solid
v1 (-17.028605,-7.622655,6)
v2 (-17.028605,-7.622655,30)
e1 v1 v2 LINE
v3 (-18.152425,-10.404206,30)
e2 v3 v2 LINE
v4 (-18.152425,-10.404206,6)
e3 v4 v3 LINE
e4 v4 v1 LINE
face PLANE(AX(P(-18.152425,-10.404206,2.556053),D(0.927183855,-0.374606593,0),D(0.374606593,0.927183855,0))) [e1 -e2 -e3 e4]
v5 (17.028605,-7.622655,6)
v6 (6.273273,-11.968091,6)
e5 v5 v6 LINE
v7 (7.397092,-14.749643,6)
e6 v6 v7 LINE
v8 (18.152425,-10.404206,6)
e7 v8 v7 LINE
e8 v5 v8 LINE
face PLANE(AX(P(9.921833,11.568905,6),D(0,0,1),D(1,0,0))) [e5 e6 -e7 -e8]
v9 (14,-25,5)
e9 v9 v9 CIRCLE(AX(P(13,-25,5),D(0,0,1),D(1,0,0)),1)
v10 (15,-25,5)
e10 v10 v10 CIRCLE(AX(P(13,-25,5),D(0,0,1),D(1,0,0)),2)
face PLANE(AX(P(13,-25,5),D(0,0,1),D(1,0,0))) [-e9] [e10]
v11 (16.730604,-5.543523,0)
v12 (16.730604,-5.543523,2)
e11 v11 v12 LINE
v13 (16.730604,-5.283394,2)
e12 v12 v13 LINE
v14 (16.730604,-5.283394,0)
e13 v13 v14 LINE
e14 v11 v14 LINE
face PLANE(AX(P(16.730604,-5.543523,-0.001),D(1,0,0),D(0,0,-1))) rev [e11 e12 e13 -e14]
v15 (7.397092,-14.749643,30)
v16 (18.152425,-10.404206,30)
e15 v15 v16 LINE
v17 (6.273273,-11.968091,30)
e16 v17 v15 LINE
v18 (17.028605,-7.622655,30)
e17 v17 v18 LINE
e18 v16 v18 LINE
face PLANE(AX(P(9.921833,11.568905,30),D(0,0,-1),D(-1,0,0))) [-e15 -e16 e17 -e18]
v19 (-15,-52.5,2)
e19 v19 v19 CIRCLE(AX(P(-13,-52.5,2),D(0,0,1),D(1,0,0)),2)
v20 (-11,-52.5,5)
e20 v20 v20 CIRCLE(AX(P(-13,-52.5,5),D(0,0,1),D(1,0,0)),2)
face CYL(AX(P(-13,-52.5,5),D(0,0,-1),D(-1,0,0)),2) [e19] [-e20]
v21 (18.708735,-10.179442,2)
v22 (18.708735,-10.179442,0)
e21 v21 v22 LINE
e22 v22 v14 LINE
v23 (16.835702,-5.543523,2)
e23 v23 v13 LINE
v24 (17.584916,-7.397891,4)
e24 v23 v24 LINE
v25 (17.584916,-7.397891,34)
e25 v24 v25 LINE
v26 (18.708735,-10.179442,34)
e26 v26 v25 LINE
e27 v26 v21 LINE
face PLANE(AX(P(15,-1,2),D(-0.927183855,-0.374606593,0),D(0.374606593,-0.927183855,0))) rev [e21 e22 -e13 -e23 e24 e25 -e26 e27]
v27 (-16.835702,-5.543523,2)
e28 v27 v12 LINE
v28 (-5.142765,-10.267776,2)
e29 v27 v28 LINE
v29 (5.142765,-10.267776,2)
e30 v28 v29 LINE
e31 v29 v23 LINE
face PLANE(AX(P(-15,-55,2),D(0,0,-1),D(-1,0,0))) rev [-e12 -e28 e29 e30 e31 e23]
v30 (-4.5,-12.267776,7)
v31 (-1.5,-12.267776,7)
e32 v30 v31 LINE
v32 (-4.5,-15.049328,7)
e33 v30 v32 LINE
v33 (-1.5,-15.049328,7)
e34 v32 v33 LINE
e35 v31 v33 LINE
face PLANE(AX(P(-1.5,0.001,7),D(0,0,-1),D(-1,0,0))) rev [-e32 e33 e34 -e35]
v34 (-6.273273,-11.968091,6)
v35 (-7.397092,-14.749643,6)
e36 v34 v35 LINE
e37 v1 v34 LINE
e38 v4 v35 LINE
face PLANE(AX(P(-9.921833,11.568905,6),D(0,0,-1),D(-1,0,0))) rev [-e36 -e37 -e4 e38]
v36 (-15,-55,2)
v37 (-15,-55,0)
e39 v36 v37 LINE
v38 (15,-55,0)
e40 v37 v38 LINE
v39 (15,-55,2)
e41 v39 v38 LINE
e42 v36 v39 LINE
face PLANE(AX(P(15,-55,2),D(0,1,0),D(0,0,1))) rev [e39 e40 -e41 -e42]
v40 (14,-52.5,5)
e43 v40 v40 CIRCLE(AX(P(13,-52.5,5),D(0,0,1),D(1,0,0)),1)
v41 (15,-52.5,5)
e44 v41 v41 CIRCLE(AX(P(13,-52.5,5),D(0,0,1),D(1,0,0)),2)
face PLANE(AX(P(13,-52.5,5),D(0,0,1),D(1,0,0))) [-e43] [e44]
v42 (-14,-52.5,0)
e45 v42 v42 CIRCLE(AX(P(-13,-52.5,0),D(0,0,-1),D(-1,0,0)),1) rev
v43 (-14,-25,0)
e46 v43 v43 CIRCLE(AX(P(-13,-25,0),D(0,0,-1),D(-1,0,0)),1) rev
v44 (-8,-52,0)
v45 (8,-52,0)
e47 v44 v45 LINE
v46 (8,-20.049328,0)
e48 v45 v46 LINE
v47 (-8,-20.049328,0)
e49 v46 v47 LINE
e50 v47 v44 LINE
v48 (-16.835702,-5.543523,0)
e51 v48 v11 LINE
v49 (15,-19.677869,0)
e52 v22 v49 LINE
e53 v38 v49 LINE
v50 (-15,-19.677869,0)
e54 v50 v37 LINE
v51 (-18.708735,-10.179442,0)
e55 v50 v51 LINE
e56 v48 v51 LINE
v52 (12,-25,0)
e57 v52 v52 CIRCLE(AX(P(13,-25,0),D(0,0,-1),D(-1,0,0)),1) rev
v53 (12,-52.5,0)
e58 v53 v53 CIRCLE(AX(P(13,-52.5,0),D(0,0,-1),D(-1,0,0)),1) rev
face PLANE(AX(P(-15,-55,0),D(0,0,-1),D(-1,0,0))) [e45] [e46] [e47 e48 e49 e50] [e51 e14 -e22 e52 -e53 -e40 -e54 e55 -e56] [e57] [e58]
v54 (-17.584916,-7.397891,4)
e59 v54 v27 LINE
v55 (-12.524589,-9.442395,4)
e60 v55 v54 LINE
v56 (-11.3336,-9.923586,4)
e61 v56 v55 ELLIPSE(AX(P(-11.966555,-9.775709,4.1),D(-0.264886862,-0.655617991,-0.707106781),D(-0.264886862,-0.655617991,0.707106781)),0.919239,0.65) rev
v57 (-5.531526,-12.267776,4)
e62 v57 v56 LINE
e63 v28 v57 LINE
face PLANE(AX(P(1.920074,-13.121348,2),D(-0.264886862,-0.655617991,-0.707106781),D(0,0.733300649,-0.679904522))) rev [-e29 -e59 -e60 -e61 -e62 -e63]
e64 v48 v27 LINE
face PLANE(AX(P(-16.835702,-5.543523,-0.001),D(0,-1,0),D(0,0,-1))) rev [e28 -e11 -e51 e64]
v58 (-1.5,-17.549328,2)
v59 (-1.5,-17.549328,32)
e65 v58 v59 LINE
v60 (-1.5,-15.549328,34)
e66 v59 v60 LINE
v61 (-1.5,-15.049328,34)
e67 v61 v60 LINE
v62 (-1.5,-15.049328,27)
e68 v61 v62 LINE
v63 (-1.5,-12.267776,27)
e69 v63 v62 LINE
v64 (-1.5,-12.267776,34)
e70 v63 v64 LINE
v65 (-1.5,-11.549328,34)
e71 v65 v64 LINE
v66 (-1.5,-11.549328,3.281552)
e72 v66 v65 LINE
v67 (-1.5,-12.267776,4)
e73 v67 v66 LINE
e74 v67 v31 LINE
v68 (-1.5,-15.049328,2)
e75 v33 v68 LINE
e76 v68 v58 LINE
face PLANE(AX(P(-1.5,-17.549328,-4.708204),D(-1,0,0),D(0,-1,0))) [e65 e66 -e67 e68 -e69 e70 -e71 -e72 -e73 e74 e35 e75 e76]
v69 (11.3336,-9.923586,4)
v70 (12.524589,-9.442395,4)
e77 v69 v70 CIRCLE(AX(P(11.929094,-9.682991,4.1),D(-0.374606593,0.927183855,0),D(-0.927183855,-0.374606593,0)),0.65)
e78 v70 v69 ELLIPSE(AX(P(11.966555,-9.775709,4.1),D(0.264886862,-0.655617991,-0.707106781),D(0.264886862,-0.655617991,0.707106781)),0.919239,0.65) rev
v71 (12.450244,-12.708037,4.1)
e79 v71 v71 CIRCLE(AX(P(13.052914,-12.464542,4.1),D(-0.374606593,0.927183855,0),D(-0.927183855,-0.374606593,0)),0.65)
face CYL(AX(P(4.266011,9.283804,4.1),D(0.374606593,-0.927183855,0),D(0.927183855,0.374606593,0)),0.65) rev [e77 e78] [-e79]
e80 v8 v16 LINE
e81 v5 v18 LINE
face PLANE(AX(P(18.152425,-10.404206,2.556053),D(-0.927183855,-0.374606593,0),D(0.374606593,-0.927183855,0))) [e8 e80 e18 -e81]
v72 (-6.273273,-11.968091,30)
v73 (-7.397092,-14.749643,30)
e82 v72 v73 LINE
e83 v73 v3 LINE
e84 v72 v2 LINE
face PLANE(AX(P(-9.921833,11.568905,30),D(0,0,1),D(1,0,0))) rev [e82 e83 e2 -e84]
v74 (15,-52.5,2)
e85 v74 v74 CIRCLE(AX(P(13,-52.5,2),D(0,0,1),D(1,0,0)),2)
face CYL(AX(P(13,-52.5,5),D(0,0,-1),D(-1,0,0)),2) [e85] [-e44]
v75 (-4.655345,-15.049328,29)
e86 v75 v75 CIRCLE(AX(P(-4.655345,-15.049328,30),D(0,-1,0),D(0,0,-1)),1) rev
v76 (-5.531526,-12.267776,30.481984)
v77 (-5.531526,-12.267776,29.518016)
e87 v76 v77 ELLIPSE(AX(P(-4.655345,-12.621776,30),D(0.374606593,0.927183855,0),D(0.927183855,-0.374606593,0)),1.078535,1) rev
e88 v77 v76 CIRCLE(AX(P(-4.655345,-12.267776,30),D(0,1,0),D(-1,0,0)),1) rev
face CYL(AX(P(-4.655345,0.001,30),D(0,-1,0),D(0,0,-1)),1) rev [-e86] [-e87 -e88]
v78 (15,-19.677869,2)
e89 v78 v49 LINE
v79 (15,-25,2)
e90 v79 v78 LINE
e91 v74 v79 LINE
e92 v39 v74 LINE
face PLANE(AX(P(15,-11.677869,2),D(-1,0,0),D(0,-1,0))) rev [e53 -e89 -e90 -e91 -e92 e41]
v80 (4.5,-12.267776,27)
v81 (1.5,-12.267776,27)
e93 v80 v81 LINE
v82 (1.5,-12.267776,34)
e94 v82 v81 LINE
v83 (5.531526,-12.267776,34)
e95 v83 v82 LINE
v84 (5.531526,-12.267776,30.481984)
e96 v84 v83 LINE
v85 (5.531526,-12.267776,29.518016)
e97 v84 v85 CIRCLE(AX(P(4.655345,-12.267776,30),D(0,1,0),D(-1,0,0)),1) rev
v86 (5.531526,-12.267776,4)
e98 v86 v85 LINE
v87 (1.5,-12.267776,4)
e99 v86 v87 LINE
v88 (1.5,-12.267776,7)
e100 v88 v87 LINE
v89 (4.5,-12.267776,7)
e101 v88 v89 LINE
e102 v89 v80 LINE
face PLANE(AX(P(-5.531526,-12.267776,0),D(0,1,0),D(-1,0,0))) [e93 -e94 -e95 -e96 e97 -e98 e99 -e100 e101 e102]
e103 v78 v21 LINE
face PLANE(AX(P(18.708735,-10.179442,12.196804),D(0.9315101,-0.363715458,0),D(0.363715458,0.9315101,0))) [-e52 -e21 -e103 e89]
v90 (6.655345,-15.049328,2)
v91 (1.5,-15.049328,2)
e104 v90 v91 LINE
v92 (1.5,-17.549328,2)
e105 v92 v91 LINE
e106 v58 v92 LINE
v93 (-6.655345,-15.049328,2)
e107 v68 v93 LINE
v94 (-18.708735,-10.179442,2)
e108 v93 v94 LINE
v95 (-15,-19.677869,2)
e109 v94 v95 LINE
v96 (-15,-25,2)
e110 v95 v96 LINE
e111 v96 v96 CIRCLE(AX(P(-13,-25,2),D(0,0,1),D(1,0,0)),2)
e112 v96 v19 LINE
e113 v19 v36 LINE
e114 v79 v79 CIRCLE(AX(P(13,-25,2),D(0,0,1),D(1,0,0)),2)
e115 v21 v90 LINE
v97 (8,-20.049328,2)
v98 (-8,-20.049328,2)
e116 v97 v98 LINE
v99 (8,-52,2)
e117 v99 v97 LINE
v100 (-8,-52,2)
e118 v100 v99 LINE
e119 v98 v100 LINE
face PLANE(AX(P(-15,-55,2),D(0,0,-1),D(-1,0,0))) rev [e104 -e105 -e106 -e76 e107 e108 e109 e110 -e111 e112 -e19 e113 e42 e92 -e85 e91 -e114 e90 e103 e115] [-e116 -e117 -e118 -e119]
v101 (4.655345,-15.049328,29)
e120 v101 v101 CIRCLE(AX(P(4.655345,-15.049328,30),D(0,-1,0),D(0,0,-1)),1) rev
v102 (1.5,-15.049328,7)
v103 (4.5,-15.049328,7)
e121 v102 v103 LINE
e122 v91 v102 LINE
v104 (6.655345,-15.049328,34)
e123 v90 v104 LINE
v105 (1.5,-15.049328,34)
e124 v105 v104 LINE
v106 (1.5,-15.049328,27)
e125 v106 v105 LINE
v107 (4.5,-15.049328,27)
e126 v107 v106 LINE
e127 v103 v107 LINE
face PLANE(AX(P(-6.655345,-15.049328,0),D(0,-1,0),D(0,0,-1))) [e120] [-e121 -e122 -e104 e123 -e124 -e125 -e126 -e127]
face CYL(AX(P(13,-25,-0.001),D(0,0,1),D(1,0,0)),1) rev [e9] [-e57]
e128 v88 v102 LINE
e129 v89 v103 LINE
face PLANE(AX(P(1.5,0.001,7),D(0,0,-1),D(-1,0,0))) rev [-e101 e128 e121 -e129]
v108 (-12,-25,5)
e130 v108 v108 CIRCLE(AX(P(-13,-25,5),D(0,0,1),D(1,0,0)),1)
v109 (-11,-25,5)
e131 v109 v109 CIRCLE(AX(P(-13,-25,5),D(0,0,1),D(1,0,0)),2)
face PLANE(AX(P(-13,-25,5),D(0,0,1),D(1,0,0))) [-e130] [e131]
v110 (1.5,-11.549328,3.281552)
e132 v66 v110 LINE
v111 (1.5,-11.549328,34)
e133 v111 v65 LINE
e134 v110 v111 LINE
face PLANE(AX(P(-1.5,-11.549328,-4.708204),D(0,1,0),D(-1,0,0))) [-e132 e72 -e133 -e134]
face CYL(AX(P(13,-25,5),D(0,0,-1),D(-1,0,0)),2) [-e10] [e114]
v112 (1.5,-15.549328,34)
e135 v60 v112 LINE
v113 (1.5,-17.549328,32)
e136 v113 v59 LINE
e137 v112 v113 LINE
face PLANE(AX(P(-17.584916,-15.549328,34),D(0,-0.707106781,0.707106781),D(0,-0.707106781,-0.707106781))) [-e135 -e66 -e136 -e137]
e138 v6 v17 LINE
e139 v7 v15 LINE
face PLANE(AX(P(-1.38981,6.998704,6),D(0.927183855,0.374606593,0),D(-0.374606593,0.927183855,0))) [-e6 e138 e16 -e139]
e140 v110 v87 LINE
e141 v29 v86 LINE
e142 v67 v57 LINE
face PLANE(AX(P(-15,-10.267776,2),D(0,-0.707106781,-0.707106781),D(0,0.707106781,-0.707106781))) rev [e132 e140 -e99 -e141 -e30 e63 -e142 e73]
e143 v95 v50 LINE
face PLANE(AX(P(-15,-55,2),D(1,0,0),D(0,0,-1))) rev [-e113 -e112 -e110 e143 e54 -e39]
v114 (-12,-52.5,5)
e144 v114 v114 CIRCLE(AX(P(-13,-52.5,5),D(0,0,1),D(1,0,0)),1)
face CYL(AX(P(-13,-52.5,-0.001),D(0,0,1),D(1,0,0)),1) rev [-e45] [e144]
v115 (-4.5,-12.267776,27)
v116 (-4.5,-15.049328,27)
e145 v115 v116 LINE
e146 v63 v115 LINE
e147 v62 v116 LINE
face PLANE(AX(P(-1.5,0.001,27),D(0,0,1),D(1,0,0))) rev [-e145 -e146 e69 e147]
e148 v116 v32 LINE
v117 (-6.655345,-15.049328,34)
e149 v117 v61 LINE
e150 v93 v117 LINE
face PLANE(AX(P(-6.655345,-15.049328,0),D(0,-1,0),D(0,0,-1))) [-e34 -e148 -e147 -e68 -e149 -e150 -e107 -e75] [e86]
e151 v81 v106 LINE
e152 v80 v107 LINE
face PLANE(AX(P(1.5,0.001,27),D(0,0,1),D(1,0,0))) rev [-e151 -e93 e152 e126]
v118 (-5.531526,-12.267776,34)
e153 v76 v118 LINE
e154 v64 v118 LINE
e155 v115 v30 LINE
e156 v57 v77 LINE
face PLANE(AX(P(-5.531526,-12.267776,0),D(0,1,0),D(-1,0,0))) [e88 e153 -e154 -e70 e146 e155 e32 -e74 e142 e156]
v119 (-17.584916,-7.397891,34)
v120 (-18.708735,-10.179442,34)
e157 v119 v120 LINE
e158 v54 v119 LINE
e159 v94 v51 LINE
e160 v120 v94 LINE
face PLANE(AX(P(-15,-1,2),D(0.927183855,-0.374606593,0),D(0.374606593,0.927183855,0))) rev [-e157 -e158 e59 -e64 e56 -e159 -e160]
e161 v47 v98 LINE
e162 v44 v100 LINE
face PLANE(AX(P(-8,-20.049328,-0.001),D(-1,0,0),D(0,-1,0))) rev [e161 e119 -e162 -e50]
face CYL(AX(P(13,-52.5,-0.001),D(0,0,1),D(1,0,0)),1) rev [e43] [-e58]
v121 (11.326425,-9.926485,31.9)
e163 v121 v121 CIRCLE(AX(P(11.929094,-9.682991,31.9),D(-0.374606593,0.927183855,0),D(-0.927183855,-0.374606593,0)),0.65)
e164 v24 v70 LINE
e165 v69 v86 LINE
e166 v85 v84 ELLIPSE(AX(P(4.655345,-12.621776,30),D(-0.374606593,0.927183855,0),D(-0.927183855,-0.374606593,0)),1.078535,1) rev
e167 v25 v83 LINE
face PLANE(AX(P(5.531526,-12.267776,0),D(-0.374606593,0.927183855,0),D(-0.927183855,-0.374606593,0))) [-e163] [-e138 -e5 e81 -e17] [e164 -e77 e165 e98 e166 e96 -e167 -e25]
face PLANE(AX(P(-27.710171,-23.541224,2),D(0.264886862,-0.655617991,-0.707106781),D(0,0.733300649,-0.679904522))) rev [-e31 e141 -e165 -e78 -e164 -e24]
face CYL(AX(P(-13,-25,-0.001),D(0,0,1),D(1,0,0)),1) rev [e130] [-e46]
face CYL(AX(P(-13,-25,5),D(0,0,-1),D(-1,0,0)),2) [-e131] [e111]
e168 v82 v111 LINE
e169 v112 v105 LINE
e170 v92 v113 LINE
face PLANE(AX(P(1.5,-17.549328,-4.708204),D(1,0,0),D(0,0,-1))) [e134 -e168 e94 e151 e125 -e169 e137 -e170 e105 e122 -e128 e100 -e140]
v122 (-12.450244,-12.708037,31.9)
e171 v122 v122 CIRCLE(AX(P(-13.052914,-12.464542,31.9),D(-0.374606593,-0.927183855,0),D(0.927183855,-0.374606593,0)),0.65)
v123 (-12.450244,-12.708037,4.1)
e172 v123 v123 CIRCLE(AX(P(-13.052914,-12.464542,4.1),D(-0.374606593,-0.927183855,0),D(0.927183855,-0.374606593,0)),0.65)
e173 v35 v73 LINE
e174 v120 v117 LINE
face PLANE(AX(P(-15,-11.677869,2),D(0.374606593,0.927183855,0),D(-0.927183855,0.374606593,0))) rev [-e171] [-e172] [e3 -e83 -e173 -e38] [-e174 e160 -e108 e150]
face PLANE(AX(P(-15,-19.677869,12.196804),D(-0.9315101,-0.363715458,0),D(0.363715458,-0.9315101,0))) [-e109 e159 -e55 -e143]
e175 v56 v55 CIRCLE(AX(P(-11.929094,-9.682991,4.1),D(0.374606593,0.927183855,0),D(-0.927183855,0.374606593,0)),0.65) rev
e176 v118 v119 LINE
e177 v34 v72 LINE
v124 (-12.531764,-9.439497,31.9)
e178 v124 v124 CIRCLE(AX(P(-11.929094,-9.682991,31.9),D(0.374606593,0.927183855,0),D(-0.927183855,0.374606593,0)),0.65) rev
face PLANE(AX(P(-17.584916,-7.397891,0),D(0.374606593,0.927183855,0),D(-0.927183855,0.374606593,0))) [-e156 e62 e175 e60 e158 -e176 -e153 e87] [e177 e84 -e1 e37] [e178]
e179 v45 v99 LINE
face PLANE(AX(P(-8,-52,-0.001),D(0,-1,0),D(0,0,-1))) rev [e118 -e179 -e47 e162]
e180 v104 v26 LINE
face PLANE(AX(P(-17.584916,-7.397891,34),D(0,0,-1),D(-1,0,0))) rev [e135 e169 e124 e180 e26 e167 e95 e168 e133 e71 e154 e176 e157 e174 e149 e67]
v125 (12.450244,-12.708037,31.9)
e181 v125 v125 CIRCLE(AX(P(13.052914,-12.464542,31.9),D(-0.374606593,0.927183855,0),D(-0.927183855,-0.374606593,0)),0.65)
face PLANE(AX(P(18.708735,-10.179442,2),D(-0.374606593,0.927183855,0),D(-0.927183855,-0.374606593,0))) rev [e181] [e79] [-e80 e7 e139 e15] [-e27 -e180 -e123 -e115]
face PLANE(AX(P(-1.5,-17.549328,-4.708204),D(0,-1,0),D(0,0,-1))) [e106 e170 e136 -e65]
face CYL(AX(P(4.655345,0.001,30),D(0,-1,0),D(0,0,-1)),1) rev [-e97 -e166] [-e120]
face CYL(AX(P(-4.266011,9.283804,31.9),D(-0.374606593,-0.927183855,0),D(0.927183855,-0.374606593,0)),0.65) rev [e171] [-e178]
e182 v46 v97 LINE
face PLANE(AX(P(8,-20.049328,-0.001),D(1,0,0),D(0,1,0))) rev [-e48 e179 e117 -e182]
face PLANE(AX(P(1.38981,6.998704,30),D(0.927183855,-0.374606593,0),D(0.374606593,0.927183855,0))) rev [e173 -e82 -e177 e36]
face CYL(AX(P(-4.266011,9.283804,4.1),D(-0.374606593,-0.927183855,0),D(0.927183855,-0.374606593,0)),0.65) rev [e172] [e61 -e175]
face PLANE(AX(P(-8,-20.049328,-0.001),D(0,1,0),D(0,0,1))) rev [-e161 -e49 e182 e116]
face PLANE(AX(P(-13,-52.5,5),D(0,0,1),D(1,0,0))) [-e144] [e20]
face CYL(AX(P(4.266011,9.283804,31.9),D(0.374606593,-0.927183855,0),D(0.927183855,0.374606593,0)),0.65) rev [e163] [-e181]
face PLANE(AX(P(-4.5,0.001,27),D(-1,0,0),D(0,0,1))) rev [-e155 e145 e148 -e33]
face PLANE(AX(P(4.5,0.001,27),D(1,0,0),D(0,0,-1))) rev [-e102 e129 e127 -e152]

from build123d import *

# Parameters (mm, degrees)
EXTRUDE_1_DEPTH      = 2
EXTRUDE_2_DEPTH      = 32
EXTRUDE_2_DEPTH_BACK = 2
CUT_EXTRUDE_5_REACH  = 59.048
SKETCH_3_R           = 0.65
SKETCH_3_W           = 12.2
SKETCH_3_H           = 24
CUT_EXTRUDE_7_REACH  = 59.919
SKETCH_12_R          = 0.65
SKETCH_12_W          = 12.2
SKETCH_12_H          = 24
CUT_EXTRUDE_8_REACH  = 68.325
SKETCH_13_R          = 1
SKETCH_13_W          = 16
SKETCH_13_H          = 31.950672009
CHAMFER_4_SIZE       = 1
CHAMFER_5_SIZE       = 2
EXTRUDE_START        = -32
SKETCH_14_W          = 3
SKETCH_14_H          = 6
EXTRUDE_8_DEPTH      = 32
CHAMFER_6_SIZE       = 2
EXTRUDE_START_2      = 3
SKETCH_15_R          = 2
SKETCH_15_R_2        = 1
EXTRUDE_9_DEPTH      = 3
CUT_EXTRUDE_9_REACH  = 57.696
SKETCH_16_W          = 3
SKETCH_16_H          = 20
EXTRUDE_10_DEPTH     = 2
EXTRUDE_11_DEPTH     = 28
CUT_EXTRUDE_10_REACH = 55.931
SKETCH_19_R          = 1
CUT_EXTRUDE_11_REACH = 68.325
SKETCH_20_W          = 33.566306147
SKETCH_20_H          = 6.687524296


# Some blends are built 0.0001 mm under size
with BuildPart() as part:
    # 草圖1 → 填料-伸長1 (new body)
    with BuildSketch(Plane.XY):
        Polygon((-15, 0), (15, 0), (15, -1), (18.708735418, -10.179442277), (15, -11.67786865), (15, -55), (-15, -55), (-15, -11.67786865), (-18.708735418, -10.179442277), (-15, -1), align=None)
    extrude(amount=EXTRUDE_1_DEPTH)

    # 草圖2 → 填料-伸長2 (add, two sides: drawn at the far end of the back side and taken through both)
    with BuildSketch(Plane.XY.offset(2).offset(-EXTRUDE_2_DEPTH_BACK)):
        Polygon((-18.708735418, -10.179442277), (-6.655345309, -15.049327991), (6.655345309, -15.049327991), (18.708735418, -10.179442277), (17.584915638, -7.397890713), (5.531525529, -12.267776427), (-5.531525529, -12.267776427), (-17.584915638, -7.397890713), align=None)
    extrude(amount=EXTRUDE_2_DEPTH + EXTRUDE_2_DEPTH_BACK)

    # 草圖3 → 除料-伸長5 (cut, up to next)
    with BuildSketch(Plane(origin=(4.914686172, -15.752599933, 0), x_dir=(0.9271838545667884, 0.37460659341590963, 0), z_dir=(-0.37460659341590963, 0.9271838545667884, 0)), mode=Mode.PRIVATE) as cut_extrude_5_sk1:
        with Locations(Location((8.777361354, -4.1, 0), (0, 0, 180))):
            Circle(SKETCH_3_R)
    cut_extrude_5_tool1 = extrude(cut_extrude_5_sk1.sketch, amount=CUT_EXTRUDE_5_REACH, mode=Mode.PRIVATE) & part.part
    # 草圖3 → 除料-伸長5 (cut, up to next)
    with BuildSketch(Plane(origin=(4.914686172, -15.752599933, 0), x_dir=(0.9271838545667884, 0.37460659341590963, 0), z_dir=(-0.37460659341590963, 0.9271838545667884, 0)), mode=Mode.PRIVATE) as cut_extrude_5_sk2:
        with Locations(Location((8.777361354, -31.9, 0), (0, 0, 180))):
            Circle(SKETCH_3_R)
    cut_extrude_5_tool2 = extrude(cut_extrude_5_sk2.sketch, amount=CUT_EXTRUDE_5_REACH, mode=Mode.PRIVATE) & part.part
    # 草圖3 → 除料-伸長5 (cut, up to next)
    with BuildSketch(Plane(origin=(4.914686172, -15.752599933, 0), x_dir=(0.9271838545667884, 0.37460659341590963, 0), z_dir=(-0.37460659341590963, 0.9271838545667884, 0)), mode=Mode.PRIVATE) as cut_extrude_5_sk3:
        with Locations((8.777361354, -18)):
            Rectangle(SKETCH_3_W, SKETCH_3_H)
    cut_extrude_5_tool3 = extrude(cut_extrude_5_sk3.sketch, amount=CUT_EXTRUDE_5_REACH, mode=Mode.PRIVATE) & part.part
    add(cut_extrude_5_tool1.solids().sort_by_distance((13.052914, -12.464542, 4.1))[0], mode=Mode.SUBTRACT)
    add(cut_extrude_5_tool2.solids().sort_by_distance((13.052914, -12.464542, 31.9))[0], mode=Mode.SUBTRACT)
    add(cut_extrude_5_tool3.solids().sort_by_distance((13.052914, -12.464542, 18))[0], mode=Mode.SUBTRACT)

    # 草圖12 → 除料-伸長7 (cut, up to next)
    with BuildSketch(Plane(origin=(-6.161016101, -15.249049955, 0), x_dir=(0.9271838545667846, -0.3746065934159192, 0), z_dir=(-0.3746065934159192, -0.9271838545667846, 0)), mode=Mode.PRIVATE) as cut_extrude_7_sk1:
        with Locations((-7.433151225, 31.9)):
            Circle(SKETCH_12_R)
    cut_extrude_7_tool1 = extrude(cut_extrude_7_sk1.sketch, amount=-CUT_EXTRUDE_7_REACH, mode=Mode.PRIVATE) & part.part
    # 草圖12 → 除料-伸長7 (cut, up to next)
    with BuildSketch(Plane(origin=(-6.161016101, -15.249049955, 0), x_dir=(0.9271838545667846, -0.3746065934159192, 0), z_dir=(-0.3746065934159192, -0.9271838545667846, 0)), mode=Mode.PRIVATE) as cut_extrude_7_sk2:
        with Locations((-7.433151225, 4.1)):
            Circle(SKETCH_12_R)
    cut_extrude_7_tool2 = extrude(cut_extrude_7_sk2.sketch, amount=-CUT_EXTRUDE_7_REACH, mode=Mode.PRIVATE) & part.part
    # 草圖12 → 除料-伸長7 (cut, up to next)
    with BuildSketch(Plane(origin=(-6.161016101, -15.249049955, 0), x_dir=(0.9271838545667846, -0.3746065934159192, 0), z_dir=(-0.3746065934159192, -0.9271838545667846, 0)), mode=Mode.PRIVATE) as cut_extrude_7_sk3:
        with Locations((-7.433151225, 18)):
            Rectangle(SKETCH_12_W, SKETCH_12_H)
    cut_extrude_7_tool3 = extrude(cut_extrude_7_sk3.sketch, amount=-CUT_EXTRUDE_7_REACH, mode=Mode.PRIVATE) & part.part
    add(cut_extrude_7_tool1.solids().sort_by_distance((-13.052914, -12.464542, 31.9))[0], mode=Mode.SUBTRACT)
    add(cut_extrude_7_tool2.solids().sort_by_distance((-13.052914, -12.464542, 4.1))[0], mode=Mode.SUBTRACT)
    add(cut_extrude_7_tool3.solids().sort_by_distance((-13.052914, -12.464542, 18))[0], mode=Mode.SUBTRACT)

    # 草圖13 → 除料-伸長8 (cut, up to next)
    with BuildSketch(Plane.XY.offset(2), mode=Mode.PRIVATE) as cut_extrude_8_sk1:
        with Locations((-13, -25)):
            Circle(SKETCH_13_R)
    cut_extrude_8_tool1 = extrude(cut_extrude_8_sk1.sketch, amount=-CUT_EXTRUDE_8_REACH, mode=Mode.PRIVATE) & part.part
    # 草圖13 → 除料-伸長8 (cut, up to next)
    with BuildSketch(Plane.XY.offset(2), mode=Mode.PRIVATE) as cut_extrude_8_sk2:
        with Locations((13, -25)):
            Circle(SKETCH_13_R)
    cut_extrude_8_tool2 = extrude(cut_extrude_8_sk2.sketch, amount=-CUT_EXTRUDE_8_REACH, mode=Mode.PRIVATE) & part.part
    # 草圖13 → 除料-伸長8 (cut, up to next)
    with BuildSketch(Plane.XY.offset(2), mode=Mode.PRIVATE) as cut_extrude_8_sk3:
        with Locations((-13, -52.5)):
            Circle(SKETCH_13_R)
    cut_extrude_8_tool3 = extrude(cut_extrude_8_sk3.sketch, amount=-CUT_EXTRUDE_8_REACH, mode=Mode.PRIVATE) & part.part
    # 草圖13 → 除料-伸長8 (cut, up to next)
    with BuildSketch(Plane.XY.offset(2), mode=Mode.PRIVATE) as cut_extrude_8_sk4:
        with Locations((13, -52.5)):
            Circle(SKETCH_13_R)
    cut_extrude_8_tool4 = extrude(cut_extrude_8_sk4.sketch, amount=-CUT_EXTRUDE_8_REACH, mode=Mode.PRIVATE) & part.part
    # 草圖13 → 除料-伸長8 (cut, up to next)
    with BuildSketch(Plane.XY.offset(2), mode=Mode.PRIVATE) as cut_extrude_8_sk5:
        with Locations((0, -36.024663995)):
            Rectangle(SKETCH_13_W, SKETCH_13_H)
    cut_extrude_8_tool5 = extrude(cut_extrude_8_sk5.sketch, amount=-CUT_EXTRUDE_8_REACH, mode=Mode.PRIVATE) & part.part
    add(cut_extrude_8_tool1.solids().sort_by_distance((-13, -25, 2))[0], mode=Mode.SUBTRACT)
    add(cut_extrude_8_tool2.solids().sort_by_distance((13, -25, 2))[0], mode=Mode.SUBTRACT)
    add(cut_extrude_8_tool3.solids().sort_by_distance((-13, -52.5, 2))[0], mode=Mode.SUBTRACT)
    add(cut_extrude_8_tool4.solids().sort_by_distance((13, -52.5, 2))[0], mode=Mode.SUBTRACT)
    add(cut_extrude_8_tool5.solids().sort_by_distance((0, -36.024664, 2))[0], mode=Mode.SUBTRACT)

    # 導角4
    chamfer_4_edges = [part.edges().sort_by_distance(p)[0] for p in [
        (-15, 0, 1),
        (15, 0, 1),
    ]]
    chamfer(chamfer_4_edges, length=CHAMFER_4_SIZE - 0.0001)  # a hair under: the kernel refuses the full size

    # 導角5
    # the kernel refuses this chamfer: 2 mm, written as the material it adds along each edge
    with BuildSketch(Plane(origin=(-0.762679638, -14.194515234, 2), x_dir=(0.374464960998025, 0.9268333020312569, -0.02749587661058639), z_dir=(-0.9271838545667873, 0.37460659341591224, 0))) as chamfer_5_piece_1_section:
        Polygon((CHAMFER_5_SIZE * 0.999621916911, -CHAMFER_5_SIZE * 0.0274958766106), (-CHAMFER_5_SIZE * 0.0274958766106, -CHAMFER_5_SIZE * 0.999621916911), (0, 0), align=None)
    chamfer_5_piece_1 = extrude(amount=18.143365976, mode=Mode.PRIVATE)
    chamfer_5_piece_1 = chamfer_5_piece_1 - Plane(origin=(-11.749090567, -9.237466492, 4.1), x_dir=(0.9271838545667846, -0.3746065934159192, 0), z_dir=(-0.3746065934159192, -0.9271838545667846, 0)) * Cylinder(0.65, 45, mode=Mode.PRIVATE)
    add(chamfer_5_piece_1)
    with BuildSketch(Plane(origin=(10.674891505, -12.267776427, 2), x_dir=(0, 0.9996219169112968, -0.027495876610586355), z_dir=(-1, 0, 0))) as chamfer_5_piece_2:
        Polygon((CHAMFER_5_SIZE * 0.999621916911, -CHAMFER_5_SIZE * 0.0274958766106), (-CHAMFER_5_SIZE * 0.0274958766106, -CHAMFER_5_SIZE * 0.999621916911), (0, 0), align=None)
    extrude(amount=21.349783009)
    with BuildSketch(Plane(origin=(17.584915638, -7.397890713, 2), x_dir=(-0.37446496099802423, 0.926833302031257, -0.027495876610586365), z_dir=(-0.9271838545667876, -0.3746065934159116, 0))) as chamfer_5_piece_3_section:
        Polygon((CHAMFER_5_SIZE * 0.999621916911, -CHAMFER_5_SIZE * 0.0274958766106), (-CHAMFER_5_SIZE * 0.0274958766106, -CHAMFER_5_SIZE * 0.999621916911), (0, 0), align=None)
    chamfer_5_piece_3 = extrude(amount=18.143365976, mode=Mode.PRIVATE)
    chamfer_5_piece_3 = chamfer_5_piece_3 - Plane(origin=(11.664740132, -9.02869184, 4.1), x_dir=(-0.9271838545667884, -0.37460659341590963, 0), z_dir=(0.37460659341590963, -0.9271838545667884, 0)) * Cylinder(0.65, 45, mode=Mode.PRIVATE)
    add(chamfer_5_piece_3)

    # 草圖14 → 填料-伸長8 (add)
    with BuildSketch(Plane.XY.offset(34).offset(EXTRUDE_START)):
        with Locations((0, -14.549327991)):
            Rectangle(SKETCH_14_W, SKETCH_14_H)
    extrude(amount=EXTRUDE_8_DEPTH)

    # 導角6
    chamfer_6_edges = [part.edges().sort_by_distance(p)[0] for p in [
        (0, -17.549327991, 34),
    ]]
    chamfer(chamfer_6_edges, length=CHAMFER_6_SIZE)

    # 草圖15 → 填料-伸長9 (add)
    # profile 1 of 4: a face of its own
    with BuildSketch(Plane.XY.offset(2).offset(EXTRUDE_START_2)):
        with Locations(Location((-13, -25, 0), (0, 0, 180))):
            Circle(SKETCH_15_R)
        with Locations((-13, -25)):
            Circle(SKETCH_15_R_2, mode=Mode.SUBTRACT)
    # profile 2 of 4: a face of its own
    with BuildSketch(Plane.XY.offset(2).offset(EXTRUDE_START_2)):
        with Locations((13, -25)):
            Circle(SKETCH_15_R)
        with Locations((13, -25)):
            Circle(SKETCH_15_R_2, mode=Mode.SUBTRACT)
    # profile 3 of 4: a face of its own
    with BuildSketch(Plane.XY.offset(2).offset(EXTRUDE_START_2)):
        with Locations((13, -52.5)):
            Circle(SKETCH_15_R)
        with Locations((13, -52.5)):
            Circle(SKETCH_15_R_2, mode=Mode.SUBTRACT)
    # profile 4 of 4: a face of its own
    with BuildSketch(Plane.XY.offset(2).offset(EXTRUDE_START_2)):
        with Locations(Location((-13, -52.5, 0), (0, 0, 180))):
            Circle(SKETCH_15_R)
        with Locations((-13, -52.5)):
            Circle(SKETCH_15_R_2, mode=Mode.SUBTRACT)
    extrude(amount=-EXTRUDE_9_DEPTH)

    # 草圖16 → 除料-伸長9 (cut, up to next)
    with BuildSketch(Plane.XZ.offset(15.049327991), mode=Mode.PRIVATE) as cut_extrude_9_sk1:
        with Locations((-3, 17)):
            Rectangle(SKETCH_16_W, SKETCH_16_H)
    cut_extrude_9_tool1 = extrude(cut_extrude_9_sk1.sketch, amount=-CUT_EXTRUDE_9_REACH, mode=Mode.PRIVATE) & part.part
    # 草圖16 → 除料-伸長9 (cut, up to next)
    with BuildSketch(Plane.XZ.offset(15.049327991), mode=Mode.PRIVATE) as cut_extrude_9_sk2:
        with Locations((3, 17)):
            Rectangle(SKETCH_16_W, SKETCH_16_H)
    cut_extrude_9_tool2 = extrude(cut_extrude_9_sk2.sketch, amount=-CUT_EXTRUDE_9_REACH, mode=Mode.PRIVATE) & part.part
    add(cut_extrude_9_tool1.solids().sort_by_distance((-3, -15.049328, 17))[0], mode=Mode.SUBTRACT)
    add(cut_extrude_9_tool2.solids().sort_by_distance((3, -15.049328, 17))[0], mode=Mode.SUBTRACT)

    # 草圖17 → 填料-伸長10 (add)
    with BuildSketch(Plane(origin=(0, 0, 0), x_dir=(-1, 0, 0), z_dir=(0, 0, -1))):
        Polygon((-18.708735418, -10.179442277), (-15, -19.67786865), (-15, -11.67786865), align=None)
        Polygon((18.708735418, -10.179442277), (15, -11.67786865), (15, -19.67786865), align=None)
    extrude(amount=-EXTRUDE_10_DEPTH)

    # 草圖18 → 填料-伸長11 (add)
    with BuildSketch(Plane.XY.offset(34)):
        Polygon((-17.584915638, -7.397890713), (-18.708735418, -10.179442277), (-18.152425106, -10.404206233), (-17.028605325, -7.622654669), align=None)
        Polygon((17.584915638, -7.397890713), (18.708735418, -10.179442277), (18.152425106, -10.404206233), (17.028605325, -7.622654669), align=None)
    extrude(amount=-EXTRUDE_11_DEPTH)

    # 草圖19 → 除料-伸長10 (cut, up to next)
    with BuildSketch(Plane.XZ.offset(17.549327991), mode=Mode.PRIVATE) as cut_extrude_10_sk1:
        with Locations(Location((-4.655345309, 30, 0), (0, 0, 270))):
            Circle(SKETCH_19_R)
    cut_extrude_10_tool1 = extrude(cut_extrude_10_sk1.sketch, amount=-CUT_EXTRUDE_10_REACH, mode=Mode.PRIVATE) & part.part
    # 草圖19 → 除料-伸長10 (cut, up to next)
    with BuildSketch(Plane.XZ.offset(17.549327991), mode=Mode.PRIVATE) as cut_extrude_10_sk2:
        with Locations(Location((4.655345309, 30, 0), (0, 0, 270))):
            Circle(SKETCH_19_R)
    cut_extrude_10_tool2 = extrude(cut_extrude_10_sk2.sketch, amount=-CUT_EXTRUDE_10_REACH, mode=Mode.PRIVATE) & part.part
    add(cut_extrude_10_tool1.solids().sort_by_distance((-4.655345, -17.549328, 30))[0], mode=Mode.SUBTRACT)
    add(cut_extrude_10_tool2.solids().sort_by_distance((4.655345, -17.549328, 30))[0], mode=Mode.SUBTRACT)

    # 草圖20 → 除料-伸長11 (cut, up to next)
    with BuildSketch(Plane.XY.offset(2), mode=Mode.PRIVATE) as cut_extrude_11_sk1:
        with Locations((-0.052549378, -2.199760856)):
            Rectangle(SKETCH_20_W, SKETCH_20_H)
    cut_extrude_11_tool1 = extrude(cut_extrude_11_sk1.sketch, amount=-CUT_EXTRUDE_11_REACH, mode=Mode.PRIVATE) & part.part
    add(cut_extrude_11_tool1.solids().sort_by_distance((-0.052549, -2.199761, 2))[0], mode=Mode.SUBTRACT)


solid = part.part
